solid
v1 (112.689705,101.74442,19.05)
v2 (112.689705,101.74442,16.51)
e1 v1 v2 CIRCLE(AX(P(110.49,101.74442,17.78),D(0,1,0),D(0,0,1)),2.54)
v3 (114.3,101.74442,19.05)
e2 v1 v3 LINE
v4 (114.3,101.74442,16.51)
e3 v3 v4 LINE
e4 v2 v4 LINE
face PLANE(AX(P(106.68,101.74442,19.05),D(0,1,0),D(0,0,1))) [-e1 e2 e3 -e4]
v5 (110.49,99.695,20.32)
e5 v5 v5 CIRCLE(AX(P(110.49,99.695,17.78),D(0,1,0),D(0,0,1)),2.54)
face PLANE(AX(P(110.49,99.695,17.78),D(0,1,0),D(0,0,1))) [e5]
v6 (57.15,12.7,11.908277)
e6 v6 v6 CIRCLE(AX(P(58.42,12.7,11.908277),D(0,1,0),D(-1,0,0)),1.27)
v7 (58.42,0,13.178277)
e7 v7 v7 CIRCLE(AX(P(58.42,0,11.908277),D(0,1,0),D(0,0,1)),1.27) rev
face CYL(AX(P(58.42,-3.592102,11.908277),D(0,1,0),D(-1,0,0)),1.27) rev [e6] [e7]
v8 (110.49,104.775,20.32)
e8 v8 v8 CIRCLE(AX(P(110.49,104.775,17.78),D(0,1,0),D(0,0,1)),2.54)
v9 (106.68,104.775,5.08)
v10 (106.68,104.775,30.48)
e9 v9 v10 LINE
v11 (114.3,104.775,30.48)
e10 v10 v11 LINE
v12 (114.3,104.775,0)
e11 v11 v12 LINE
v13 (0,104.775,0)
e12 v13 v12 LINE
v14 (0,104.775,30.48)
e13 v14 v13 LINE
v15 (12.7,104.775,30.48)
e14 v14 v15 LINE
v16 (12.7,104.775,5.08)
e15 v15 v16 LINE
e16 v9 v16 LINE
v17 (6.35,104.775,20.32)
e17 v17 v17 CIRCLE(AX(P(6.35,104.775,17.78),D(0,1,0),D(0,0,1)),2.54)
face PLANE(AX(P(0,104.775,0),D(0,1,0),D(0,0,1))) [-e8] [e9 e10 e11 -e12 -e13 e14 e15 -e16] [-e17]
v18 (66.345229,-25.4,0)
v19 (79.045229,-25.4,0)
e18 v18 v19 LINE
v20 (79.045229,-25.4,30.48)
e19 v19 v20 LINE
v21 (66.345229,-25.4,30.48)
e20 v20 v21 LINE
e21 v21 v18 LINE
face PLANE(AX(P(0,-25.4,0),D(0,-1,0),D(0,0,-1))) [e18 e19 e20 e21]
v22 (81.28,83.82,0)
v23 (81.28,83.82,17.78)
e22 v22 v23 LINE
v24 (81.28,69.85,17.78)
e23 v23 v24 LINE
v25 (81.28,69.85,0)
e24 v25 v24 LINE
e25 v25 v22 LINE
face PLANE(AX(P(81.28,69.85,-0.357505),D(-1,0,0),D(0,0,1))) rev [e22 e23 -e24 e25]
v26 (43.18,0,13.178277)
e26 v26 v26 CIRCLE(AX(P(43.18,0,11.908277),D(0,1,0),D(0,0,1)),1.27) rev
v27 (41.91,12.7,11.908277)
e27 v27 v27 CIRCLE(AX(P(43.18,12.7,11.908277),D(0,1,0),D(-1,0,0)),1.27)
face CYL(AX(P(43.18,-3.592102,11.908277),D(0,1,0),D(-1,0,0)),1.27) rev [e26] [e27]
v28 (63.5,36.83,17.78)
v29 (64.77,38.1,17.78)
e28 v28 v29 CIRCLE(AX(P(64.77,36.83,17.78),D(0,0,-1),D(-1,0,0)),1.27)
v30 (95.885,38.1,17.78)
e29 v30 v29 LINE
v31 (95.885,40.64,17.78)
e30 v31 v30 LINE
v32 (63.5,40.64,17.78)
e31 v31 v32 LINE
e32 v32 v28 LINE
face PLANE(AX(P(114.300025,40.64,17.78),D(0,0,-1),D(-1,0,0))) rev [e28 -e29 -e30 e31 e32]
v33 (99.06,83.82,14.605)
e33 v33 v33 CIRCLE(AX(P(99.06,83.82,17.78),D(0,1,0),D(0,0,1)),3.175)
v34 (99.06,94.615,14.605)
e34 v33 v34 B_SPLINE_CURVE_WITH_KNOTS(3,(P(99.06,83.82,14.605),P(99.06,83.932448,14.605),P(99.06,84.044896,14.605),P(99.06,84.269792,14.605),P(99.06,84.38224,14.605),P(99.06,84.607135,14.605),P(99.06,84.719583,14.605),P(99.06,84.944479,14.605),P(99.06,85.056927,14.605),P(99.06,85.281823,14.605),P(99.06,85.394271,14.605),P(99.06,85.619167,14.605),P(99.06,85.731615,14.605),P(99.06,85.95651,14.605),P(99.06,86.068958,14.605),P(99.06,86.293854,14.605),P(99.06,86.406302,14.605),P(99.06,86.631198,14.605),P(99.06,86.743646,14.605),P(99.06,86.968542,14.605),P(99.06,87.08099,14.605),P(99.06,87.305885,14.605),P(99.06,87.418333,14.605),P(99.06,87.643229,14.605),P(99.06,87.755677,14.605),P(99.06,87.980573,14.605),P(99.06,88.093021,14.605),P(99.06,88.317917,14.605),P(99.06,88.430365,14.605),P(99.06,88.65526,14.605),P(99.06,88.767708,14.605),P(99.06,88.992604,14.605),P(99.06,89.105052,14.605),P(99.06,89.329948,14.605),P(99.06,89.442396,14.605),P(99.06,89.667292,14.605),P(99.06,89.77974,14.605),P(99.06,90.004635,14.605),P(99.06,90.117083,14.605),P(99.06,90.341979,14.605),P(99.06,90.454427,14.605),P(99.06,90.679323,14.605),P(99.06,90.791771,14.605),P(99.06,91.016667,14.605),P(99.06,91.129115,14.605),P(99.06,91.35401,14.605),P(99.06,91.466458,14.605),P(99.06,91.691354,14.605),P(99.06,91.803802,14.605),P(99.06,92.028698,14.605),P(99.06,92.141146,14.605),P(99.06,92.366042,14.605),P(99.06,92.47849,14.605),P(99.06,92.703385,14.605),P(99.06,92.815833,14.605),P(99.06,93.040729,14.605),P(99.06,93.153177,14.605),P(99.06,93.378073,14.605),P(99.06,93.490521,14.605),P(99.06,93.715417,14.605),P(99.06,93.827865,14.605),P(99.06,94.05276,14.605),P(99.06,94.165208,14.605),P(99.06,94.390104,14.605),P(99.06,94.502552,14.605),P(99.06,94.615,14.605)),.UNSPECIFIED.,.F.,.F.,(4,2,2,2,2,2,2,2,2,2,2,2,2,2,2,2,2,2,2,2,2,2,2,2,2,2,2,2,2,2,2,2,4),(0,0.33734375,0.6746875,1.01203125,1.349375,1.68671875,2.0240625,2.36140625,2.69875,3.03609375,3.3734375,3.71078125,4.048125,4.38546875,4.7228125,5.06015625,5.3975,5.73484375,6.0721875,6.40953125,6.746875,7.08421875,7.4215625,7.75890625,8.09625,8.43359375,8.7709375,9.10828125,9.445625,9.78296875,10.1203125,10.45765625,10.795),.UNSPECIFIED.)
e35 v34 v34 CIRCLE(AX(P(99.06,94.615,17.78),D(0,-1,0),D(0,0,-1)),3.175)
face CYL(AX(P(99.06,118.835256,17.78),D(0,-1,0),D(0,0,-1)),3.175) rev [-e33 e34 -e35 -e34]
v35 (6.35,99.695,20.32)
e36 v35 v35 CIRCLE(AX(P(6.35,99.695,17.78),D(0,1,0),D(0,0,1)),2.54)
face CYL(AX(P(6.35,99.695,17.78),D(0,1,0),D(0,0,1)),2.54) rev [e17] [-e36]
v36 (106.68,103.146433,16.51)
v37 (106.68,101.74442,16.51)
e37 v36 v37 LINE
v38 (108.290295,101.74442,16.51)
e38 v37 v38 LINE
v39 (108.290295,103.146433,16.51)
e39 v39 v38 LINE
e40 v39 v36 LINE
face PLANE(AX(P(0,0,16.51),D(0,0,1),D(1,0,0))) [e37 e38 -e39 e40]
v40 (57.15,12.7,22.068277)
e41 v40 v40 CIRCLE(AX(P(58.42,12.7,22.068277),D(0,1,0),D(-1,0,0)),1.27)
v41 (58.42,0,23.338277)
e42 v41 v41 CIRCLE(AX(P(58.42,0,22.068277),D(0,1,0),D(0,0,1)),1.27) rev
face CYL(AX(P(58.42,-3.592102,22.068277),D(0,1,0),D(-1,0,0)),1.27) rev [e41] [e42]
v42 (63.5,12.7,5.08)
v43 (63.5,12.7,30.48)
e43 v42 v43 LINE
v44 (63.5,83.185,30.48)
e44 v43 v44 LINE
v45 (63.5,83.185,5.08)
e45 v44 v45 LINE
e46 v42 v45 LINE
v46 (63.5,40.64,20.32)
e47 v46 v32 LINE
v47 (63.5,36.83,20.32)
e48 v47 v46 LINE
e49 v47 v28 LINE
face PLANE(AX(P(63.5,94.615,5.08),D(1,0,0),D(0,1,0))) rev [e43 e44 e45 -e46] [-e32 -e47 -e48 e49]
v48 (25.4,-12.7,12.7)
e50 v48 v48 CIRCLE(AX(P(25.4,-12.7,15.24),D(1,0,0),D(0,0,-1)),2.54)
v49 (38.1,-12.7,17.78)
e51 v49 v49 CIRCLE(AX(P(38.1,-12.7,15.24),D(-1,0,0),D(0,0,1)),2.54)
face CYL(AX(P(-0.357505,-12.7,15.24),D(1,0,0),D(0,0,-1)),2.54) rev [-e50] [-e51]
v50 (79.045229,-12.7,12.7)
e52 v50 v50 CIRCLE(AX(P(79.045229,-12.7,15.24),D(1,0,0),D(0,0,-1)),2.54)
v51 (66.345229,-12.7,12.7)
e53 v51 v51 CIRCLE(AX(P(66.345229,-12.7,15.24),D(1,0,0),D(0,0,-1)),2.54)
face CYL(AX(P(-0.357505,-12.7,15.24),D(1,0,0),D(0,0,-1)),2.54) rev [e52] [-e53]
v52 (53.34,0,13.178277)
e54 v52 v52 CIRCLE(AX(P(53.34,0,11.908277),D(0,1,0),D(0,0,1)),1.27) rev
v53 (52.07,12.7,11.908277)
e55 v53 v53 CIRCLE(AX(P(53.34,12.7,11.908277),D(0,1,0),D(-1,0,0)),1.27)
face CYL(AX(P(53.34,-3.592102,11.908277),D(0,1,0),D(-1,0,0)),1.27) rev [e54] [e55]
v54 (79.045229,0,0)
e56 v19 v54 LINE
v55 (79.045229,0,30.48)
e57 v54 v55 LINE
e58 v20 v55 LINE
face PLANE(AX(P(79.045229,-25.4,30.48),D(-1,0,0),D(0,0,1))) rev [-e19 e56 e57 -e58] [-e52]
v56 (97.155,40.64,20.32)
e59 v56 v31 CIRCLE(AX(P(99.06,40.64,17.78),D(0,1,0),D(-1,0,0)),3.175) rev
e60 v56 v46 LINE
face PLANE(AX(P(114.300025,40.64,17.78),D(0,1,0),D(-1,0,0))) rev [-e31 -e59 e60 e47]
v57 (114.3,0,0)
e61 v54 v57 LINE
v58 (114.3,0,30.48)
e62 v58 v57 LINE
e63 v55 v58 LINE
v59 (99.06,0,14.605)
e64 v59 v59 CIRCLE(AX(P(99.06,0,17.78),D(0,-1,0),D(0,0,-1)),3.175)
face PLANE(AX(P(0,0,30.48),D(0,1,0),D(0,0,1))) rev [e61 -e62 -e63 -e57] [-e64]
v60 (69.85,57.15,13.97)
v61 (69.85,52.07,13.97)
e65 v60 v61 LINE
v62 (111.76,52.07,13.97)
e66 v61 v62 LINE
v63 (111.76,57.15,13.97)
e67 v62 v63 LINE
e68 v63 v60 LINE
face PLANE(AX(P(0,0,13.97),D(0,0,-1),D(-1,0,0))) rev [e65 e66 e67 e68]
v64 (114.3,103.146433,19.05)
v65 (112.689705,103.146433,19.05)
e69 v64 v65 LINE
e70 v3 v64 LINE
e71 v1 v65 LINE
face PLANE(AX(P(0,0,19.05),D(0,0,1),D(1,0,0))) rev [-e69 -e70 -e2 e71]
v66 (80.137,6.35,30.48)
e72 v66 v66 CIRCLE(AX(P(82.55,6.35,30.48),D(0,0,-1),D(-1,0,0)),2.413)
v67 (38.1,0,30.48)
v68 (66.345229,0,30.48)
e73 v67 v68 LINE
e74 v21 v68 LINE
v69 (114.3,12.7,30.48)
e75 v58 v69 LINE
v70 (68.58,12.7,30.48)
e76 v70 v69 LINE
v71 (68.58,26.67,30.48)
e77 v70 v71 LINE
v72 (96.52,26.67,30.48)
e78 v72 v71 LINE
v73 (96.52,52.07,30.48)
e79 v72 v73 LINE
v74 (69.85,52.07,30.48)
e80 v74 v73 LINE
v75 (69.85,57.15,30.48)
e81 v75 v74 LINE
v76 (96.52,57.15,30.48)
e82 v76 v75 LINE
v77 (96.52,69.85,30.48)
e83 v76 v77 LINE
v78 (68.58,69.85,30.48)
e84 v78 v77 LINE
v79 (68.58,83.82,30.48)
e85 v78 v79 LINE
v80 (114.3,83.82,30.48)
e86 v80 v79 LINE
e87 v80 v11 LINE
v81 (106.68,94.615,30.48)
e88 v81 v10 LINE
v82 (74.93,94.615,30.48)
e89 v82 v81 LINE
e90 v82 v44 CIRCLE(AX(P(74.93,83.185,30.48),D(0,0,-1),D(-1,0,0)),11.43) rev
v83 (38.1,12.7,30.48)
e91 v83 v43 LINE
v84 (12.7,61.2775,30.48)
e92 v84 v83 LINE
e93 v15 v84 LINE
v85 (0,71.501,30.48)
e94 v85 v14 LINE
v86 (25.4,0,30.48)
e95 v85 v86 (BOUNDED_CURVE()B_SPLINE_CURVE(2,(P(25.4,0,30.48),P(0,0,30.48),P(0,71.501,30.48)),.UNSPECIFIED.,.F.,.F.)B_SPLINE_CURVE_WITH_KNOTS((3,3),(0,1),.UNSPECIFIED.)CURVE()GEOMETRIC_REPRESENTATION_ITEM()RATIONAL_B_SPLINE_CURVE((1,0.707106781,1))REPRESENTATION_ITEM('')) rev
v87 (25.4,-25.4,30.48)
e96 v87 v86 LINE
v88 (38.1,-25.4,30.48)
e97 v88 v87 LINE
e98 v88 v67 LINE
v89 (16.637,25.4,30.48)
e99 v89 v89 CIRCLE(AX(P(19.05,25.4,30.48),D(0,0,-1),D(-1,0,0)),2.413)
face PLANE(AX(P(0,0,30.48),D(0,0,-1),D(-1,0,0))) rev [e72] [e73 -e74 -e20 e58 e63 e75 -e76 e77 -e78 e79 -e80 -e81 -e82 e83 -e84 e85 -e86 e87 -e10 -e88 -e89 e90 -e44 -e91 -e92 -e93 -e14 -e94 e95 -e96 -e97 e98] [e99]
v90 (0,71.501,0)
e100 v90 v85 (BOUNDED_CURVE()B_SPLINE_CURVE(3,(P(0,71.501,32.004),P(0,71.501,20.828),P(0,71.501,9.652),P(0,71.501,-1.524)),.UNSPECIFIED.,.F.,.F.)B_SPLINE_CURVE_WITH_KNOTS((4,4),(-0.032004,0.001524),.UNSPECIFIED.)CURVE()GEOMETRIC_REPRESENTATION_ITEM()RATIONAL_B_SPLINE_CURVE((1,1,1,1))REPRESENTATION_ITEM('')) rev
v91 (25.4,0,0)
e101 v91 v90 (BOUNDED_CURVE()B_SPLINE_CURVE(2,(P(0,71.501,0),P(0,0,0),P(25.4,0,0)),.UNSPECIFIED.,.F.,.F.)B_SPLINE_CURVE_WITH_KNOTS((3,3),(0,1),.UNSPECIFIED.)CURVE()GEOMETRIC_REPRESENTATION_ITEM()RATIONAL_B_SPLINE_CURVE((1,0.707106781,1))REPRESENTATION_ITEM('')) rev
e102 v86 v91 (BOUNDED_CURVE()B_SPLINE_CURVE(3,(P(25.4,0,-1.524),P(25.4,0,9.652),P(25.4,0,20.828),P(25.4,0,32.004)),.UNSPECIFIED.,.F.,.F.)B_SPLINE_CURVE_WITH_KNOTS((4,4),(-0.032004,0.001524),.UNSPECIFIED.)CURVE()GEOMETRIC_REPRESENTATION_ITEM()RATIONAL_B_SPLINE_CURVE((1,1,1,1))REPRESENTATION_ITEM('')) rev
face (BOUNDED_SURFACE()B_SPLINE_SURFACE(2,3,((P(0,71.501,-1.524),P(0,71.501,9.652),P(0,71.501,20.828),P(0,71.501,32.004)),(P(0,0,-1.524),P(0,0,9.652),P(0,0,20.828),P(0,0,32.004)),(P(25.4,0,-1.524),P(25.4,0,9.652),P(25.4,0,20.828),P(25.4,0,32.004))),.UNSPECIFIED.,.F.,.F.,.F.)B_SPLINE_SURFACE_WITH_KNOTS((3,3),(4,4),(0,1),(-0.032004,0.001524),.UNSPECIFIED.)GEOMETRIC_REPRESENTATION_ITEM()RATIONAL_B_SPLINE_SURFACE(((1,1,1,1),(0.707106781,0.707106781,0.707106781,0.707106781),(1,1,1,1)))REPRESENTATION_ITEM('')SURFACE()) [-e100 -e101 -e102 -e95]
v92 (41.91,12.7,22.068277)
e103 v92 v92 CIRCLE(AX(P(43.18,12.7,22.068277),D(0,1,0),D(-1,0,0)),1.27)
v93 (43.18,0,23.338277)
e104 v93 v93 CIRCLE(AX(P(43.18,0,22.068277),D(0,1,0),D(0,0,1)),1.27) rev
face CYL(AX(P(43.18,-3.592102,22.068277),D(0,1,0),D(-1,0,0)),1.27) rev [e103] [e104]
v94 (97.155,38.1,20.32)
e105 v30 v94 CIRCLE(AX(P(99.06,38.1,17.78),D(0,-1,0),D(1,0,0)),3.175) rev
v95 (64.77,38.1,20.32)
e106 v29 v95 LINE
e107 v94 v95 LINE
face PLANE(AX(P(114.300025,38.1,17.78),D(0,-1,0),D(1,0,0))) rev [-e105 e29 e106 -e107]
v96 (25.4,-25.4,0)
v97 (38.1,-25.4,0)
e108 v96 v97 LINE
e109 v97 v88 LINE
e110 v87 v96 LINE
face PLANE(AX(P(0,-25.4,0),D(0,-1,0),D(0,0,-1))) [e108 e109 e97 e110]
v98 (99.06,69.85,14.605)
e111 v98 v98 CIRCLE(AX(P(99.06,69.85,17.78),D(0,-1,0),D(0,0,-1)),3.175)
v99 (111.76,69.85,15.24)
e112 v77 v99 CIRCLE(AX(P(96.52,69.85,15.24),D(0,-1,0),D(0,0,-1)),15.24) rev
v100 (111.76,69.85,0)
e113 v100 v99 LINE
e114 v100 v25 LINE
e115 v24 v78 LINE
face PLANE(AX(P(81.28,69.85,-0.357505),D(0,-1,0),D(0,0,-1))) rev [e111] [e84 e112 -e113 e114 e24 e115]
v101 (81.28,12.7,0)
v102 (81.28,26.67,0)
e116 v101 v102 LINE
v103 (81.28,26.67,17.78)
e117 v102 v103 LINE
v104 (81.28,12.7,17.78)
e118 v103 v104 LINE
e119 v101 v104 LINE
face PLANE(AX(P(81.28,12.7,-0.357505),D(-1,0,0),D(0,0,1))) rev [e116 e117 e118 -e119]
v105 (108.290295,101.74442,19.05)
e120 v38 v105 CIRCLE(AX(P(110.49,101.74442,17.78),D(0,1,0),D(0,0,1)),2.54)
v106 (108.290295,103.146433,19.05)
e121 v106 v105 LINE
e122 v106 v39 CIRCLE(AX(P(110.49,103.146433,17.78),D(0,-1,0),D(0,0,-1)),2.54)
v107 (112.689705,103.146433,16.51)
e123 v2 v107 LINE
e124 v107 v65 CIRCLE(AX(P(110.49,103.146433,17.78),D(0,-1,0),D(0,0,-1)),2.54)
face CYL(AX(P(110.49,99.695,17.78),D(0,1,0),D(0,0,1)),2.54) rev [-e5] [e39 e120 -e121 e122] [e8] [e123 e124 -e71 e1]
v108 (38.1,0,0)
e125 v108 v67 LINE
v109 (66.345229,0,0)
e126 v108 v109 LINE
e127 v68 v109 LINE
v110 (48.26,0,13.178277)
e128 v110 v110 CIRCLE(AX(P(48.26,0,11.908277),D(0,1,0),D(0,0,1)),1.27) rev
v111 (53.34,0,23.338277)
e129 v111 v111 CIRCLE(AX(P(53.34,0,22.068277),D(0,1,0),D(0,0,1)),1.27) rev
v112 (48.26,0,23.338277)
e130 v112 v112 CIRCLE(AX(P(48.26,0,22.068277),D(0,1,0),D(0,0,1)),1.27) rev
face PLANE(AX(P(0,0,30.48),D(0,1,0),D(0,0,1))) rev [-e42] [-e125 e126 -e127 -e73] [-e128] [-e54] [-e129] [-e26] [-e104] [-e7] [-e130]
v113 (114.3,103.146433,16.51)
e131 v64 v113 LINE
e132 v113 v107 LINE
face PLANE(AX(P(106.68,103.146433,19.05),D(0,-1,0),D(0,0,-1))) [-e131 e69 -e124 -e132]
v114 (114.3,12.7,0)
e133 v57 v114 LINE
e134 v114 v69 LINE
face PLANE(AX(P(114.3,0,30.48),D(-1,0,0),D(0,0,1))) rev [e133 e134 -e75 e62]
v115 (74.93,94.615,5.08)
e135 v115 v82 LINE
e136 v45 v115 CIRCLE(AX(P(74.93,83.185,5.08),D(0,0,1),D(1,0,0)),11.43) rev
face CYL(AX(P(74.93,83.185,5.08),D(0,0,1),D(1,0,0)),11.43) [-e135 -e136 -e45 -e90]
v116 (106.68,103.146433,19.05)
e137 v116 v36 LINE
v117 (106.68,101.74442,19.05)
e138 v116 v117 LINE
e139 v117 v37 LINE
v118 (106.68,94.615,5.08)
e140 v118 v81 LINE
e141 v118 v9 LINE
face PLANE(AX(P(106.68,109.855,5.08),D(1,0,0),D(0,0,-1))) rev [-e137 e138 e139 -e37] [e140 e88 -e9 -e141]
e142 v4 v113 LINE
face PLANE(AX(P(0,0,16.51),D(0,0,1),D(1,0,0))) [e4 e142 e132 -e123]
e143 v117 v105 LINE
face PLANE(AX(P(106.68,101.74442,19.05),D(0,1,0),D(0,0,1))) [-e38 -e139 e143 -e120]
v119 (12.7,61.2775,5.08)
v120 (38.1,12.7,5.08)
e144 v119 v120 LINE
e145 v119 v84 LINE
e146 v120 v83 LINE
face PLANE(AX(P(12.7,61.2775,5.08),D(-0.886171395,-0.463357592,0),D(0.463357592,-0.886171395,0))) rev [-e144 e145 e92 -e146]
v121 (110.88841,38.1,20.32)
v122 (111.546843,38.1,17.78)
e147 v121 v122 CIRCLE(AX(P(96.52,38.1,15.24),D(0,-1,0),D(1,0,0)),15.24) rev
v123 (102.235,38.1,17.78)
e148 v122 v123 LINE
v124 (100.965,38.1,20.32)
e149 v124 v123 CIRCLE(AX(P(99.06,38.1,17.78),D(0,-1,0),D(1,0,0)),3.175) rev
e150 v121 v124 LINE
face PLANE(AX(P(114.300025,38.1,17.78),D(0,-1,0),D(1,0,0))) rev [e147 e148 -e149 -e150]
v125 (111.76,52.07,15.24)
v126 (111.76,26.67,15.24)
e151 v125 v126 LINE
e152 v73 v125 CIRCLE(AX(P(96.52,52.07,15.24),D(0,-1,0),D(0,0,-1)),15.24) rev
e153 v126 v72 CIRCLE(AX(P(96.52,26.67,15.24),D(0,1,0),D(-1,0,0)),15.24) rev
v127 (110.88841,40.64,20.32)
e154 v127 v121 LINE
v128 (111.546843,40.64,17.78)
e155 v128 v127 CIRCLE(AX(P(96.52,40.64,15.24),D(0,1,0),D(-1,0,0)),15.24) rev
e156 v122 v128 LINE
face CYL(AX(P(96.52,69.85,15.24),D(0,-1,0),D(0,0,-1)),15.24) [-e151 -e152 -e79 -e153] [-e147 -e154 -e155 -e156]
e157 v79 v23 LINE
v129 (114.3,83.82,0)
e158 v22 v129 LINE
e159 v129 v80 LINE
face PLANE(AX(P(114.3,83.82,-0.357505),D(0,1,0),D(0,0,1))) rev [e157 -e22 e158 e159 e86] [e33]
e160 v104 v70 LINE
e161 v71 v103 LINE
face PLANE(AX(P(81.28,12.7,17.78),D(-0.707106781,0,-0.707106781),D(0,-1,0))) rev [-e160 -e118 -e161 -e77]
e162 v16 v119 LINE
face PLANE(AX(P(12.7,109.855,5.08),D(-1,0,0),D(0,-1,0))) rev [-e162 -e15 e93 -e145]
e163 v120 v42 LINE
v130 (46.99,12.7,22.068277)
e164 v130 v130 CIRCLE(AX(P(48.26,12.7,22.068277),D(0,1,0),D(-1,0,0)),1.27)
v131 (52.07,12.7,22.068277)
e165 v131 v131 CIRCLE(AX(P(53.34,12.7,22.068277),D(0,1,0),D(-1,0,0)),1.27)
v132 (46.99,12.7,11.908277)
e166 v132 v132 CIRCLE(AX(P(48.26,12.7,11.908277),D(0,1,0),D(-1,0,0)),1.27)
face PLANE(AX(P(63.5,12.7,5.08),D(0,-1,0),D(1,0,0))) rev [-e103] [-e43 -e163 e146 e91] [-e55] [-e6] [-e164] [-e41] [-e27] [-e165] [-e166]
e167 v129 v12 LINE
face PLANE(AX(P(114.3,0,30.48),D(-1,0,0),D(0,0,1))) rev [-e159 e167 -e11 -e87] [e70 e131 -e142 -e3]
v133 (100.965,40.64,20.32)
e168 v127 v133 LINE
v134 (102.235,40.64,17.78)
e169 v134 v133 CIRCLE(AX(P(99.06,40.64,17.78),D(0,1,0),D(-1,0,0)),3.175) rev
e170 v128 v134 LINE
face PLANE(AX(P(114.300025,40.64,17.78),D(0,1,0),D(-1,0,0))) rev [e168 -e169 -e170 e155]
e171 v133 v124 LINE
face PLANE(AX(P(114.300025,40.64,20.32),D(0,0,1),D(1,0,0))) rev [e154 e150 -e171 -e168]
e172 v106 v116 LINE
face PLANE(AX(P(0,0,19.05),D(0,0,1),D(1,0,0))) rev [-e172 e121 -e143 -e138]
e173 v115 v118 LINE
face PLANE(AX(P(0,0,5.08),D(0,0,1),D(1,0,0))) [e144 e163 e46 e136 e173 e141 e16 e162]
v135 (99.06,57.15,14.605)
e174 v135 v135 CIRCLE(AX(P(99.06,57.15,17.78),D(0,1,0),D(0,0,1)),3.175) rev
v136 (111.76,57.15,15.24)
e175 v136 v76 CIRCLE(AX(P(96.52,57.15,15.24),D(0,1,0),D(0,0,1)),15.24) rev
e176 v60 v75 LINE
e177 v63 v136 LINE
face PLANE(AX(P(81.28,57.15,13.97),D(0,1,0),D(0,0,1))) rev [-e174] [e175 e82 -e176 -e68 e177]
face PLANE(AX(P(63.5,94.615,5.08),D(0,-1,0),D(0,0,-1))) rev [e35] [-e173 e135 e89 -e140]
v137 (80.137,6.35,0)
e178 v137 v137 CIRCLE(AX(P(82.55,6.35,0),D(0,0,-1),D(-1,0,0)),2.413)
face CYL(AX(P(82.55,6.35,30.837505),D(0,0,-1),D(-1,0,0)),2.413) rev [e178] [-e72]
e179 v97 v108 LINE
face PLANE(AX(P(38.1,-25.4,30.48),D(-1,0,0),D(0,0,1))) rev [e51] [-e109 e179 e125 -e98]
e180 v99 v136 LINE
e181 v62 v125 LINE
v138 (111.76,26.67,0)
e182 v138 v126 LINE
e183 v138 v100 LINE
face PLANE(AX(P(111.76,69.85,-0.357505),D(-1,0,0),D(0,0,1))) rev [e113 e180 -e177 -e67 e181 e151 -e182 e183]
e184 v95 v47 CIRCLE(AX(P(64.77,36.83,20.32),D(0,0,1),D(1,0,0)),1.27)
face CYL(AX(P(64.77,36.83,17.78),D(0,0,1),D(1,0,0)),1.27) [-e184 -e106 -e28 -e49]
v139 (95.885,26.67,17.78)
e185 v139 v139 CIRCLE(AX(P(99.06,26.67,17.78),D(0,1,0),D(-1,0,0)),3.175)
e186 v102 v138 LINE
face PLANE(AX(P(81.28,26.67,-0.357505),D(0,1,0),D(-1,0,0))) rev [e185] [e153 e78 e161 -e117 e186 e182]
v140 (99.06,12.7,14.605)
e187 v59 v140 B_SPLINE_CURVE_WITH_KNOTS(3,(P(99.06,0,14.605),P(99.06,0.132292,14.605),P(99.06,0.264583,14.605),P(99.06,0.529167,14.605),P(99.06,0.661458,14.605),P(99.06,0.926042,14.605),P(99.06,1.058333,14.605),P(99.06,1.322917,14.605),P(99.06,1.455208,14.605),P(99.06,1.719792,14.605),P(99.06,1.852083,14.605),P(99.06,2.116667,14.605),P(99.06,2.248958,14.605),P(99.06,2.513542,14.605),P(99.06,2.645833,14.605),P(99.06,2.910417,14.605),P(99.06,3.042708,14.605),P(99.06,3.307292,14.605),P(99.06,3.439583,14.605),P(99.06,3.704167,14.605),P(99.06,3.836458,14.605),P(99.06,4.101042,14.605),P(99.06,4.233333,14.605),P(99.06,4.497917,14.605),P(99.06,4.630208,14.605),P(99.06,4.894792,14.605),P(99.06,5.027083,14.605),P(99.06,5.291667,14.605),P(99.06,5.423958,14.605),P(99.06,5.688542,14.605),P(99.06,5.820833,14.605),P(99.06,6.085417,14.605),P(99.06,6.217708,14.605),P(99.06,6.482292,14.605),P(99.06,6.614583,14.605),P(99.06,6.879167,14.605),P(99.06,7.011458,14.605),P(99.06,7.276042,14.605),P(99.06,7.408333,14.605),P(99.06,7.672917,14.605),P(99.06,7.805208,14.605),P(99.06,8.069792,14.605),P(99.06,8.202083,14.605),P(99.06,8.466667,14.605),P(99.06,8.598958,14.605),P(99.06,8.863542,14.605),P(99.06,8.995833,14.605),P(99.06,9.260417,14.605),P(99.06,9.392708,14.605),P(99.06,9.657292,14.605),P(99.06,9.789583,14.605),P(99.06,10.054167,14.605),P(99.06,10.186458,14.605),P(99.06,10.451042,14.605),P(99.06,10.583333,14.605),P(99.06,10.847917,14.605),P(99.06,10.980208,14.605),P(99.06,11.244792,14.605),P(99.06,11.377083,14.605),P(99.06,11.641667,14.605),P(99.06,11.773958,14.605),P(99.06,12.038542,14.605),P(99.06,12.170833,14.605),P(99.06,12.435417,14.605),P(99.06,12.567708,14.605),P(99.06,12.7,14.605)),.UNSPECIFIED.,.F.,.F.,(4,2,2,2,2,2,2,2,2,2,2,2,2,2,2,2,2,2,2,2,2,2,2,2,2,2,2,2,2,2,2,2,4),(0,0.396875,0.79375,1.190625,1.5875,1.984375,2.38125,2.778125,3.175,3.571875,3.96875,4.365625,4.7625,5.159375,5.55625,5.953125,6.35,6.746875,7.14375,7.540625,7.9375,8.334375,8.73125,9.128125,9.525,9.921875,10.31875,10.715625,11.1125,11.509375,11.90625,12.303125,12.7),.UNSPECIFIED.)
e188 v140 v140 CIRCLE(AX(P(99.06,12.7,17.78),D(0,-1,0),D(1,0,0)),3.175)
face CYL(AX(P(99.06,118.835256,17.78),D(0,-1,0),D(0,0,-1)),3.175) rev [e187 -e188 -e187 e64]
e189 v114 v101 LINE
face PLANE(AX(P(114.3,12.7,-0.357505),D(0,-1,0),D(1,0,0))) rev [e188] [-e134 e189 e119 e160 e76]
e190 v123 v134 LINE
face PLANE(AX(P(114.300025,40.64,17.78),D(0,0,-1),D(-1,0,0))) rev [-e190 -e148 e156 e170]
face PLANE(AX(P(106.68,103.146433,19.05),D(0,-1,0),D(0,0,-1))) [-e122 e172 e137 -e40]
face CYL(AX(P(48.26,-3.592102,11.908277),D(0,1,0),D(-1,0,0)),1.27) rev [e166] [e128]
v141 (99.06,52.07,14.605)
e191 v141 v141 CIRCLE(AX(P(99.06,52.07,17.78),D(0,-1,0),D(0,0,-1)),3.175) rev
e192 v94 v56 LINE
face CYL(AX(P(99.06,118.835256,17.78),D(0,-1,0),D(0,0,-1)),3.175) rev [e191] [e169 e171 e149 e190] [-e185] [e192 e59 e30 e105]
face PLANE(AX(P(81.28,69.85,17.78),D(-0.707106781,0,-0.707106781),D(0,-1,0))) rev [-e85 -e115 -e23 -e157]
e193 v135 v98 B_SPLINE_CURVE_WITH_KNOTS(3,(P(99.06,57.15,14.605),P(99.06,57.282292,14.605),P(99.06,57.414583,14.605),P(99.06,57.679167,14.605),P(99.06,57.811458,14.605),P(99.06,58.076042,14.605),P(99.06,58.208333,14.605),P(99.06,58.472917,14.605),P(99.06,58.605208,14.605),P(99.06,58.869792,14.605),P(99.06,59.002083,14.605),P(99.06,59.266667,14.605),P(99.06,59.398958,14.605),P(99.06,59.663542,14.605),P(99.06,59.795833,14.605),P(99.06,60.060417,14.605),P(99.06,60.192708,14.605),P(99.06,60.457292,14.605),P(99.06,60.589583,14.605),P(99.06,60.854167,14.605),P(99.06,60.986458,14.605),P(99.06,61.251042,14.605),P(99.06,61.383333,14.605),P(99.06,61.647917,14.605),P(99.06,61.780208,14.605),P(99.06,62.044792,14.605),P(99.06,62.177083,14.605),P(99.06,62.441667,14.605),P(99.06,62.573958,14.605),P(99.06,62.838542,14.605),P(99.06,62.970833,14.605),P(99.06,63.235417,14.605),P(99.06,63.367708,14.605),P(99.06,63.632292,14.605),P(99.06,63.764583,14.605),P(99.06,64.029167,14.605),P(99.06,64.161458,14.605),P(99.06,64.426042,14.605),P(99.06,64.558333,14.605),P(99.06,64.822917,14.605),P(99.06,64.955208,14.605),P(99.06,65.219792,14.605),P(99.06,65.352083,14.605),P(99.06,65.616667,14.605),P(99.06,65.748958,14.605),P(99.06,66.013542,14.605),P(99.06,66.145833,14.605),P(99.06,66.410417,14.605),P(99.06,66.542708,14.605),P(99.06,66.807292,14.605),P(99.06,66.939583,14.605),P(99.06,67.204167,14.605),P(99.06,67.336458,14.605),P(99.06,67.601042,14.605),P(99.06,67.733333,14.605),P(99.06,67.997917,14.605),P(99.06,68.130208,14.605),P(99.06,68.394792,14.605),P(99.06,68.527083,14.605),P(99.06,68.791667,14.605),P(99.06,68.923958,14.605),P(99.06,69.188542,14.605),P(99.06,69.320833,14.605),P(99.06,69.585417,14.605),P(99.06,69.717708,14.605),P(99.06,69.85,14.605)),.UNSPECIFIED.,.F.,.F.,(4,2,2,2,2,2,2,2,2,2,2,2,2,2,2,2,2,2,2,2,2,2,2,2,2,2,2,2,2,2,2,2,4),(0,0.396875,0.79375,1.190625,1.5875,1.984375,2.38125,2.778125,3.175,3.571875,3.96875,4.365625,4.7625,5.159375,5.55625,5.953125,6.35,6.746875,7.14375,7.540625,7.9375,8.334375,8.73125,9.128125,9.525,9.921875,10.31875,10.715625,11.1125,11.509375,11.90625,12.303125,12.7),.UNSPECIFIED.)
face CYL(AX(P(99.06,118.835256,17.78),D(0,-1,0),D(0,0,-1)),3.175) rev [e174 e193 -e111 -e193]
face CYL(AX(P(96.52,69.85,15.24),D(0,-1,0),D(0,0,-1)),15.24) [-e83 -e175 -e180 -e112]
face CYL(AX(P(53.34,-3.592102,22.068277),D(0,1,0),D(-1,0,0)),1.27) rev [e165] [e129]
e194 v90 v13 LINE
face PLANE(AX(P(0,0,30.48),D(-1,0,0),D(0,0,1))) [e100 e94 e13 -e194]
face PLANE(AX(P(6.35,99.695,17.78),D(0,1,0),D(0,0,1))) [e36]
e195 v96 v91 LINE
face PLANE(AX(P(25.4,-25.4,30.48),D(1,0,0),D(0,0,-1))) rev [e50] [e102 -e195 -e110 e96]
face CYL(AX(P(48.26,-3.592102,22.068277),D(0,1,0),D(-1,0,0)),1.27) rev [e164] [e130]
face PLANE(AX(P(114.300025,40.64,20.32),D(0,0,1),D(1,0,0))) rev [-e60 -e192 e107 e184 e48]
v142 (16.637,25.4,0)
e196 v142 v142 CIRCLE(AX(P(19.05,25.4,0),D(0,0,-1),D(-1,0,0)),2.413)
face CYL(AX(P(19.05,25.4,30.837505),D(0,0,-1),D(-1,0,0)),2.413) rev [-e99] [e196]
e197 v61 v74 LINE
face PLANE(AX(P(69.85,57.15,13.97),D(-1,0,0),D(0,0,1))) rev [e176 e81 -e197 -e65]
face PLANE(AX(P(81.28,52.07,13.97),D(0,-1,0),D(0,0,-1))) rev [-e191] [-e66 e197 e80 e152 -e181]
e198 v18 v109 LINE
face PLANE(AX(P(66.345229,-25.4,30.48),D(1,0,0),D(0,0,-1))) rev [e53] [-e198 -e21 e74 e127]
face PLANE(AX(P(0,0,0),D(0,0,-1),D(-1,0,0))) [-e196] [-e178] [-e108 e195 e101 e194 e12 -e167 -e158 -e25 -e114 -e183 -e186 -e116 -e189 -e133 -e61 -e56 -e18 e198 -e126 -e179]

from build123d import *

# Parameters (mm, degrees)
SKETCH2_W                      = 114.3
SKETCH2_H                      = 142.875
BOSS_EXTRUDE2_DEPTH            = 30.48
FILLET1_SIZE                   = 25.4
FILLET1_SIZE_2                 = 71.501
BOSS_EXTRUDE3_DEPTH            = 11.43
CUT_EXTRUDE2_DEPTH             = 25.4
FILLET2_R                      = 1.27
SKETCH7_W                      = 27.94
SKETCH7_H                      = 30.48
CUT_EXTRUDE4_DEPTH             = 12.7
BOSS_EXTRUDE4_DEPTH            = 11.43
CUT_EXTRUDE6_DEPTH             = 25.4
CUT_EXTRUDE7_DEPTH             = 171.262283535
CUT_EXTRUDE7_DEPTH_BACK        = 171.262283535
SKETCH11_R                     = 3.175
CUT_EXTRUDE8_REACH             = 185.225
SKETCH12_R                     = 3.175
CUT_EXTRUDE8_DIRECTION_2_DEPTH = 184.224735996
CHAMFER1_SIZE2                 = 12.7
CHAMFER1_SIZE                  = 2.54
SKETCH13_W                     = 7.62
SKETCH13_H                     = 5.08
CUT_EXTRUDE9_DEPTH             = 25.4
FILLET4_R                      = 1.27
CUT_EXTRUDE10_DEPTH            = 195.431359314
CHAMFER2_SIZE                  = 12.7
CUT_EXTRUDE11_REACH            = 196.431
SKETCH15_R                     = 3.175
BOSS_EXTRUDE5_DEPTH            = 1.27
CHAMFER3_SIZE                  = 1.27
BOSS_EXTRUDE6_DEPTH            = 1.27
CHAMFER4_SIZE                  = 1.27
FILLET5_R                      = 15.24
CUT_EXTRUDE12_DEPTH            = 16.51
SKETCH20_W                     = 2.54
SKETCH20_H                     = 2.54
CUT_EXTRUDE13_DEPTH            = 171.777226453
FILLET6_R                      = 1.27
CUT_EXTRUDE14_DEPTH            = 1.27
CUT_EXTRUDE14_DEPTH_BACK       = 1.27
SKETCH21_W                     = 5.08
SKETCH21_H                     = 33.02
SKETCH21_H_2                   = 10.040791179
SKETCH21_H_3                   = 10.09120709
SKETCH21_W_2                   = 7.62
SKETCH21_H_4                   = 1.402013576
SKETCH21_W_3                   = 1.485233779
FILLET7_R                      = 11.43
SKETCH22_R                     = 1.27
CUT_EXTRUDE15_DEPTH            = 12.7
CUT_EXTRUDE16_DEPTH            = 196.440786647
CUT_EXTRUDE16_DEPTH_BACK       = 196.440786647
SKETCH23_R                     = 2.413
SKETCH24_W                     = 12.7
SKETCH24_H                     = 30.48
BOSS_EXTRUDE7_DEPTH            = 25.4
SKETCH25_R                     = 2.54
CUT_EXTRUDE17_DEPTH            = 178.14615249
CUT_EXTRUDE18_DEPTH            = 30.48
CUT_EXTRUDE18_DEPTH_BACK       = 25.4
SKETCH26_W                     = 134.610990208
SKETCH26_H                     = 60.509174752
SKETCH27_R                     = 2.54
CUT_EXTRUDE19_DEPTH            = 5.08


# Some blends are built 0.0001 mm under size
with BuildPart() as part:
    # Sketch2 → Boss-Extrude2 (new body)
    with BuildSketch(Plane.XY):
        with Locations((57.15, 71.4375)):
            Rectangle(SKETCH2_W, SKETCH2_H)
    extrude(amount=BOSS_EXTRUDE2_DEPTH)

    # Fillet1
    # an asymmetric fillet: 71.501, 25.4 mm, written as the material it takes off along each edge
    with BuildSketch(Plane(origin=(0, 0, -178.7525), x_dir=(1, 0, 0), z_dir=(0, 0, 1))) as fillet1_piece_1:
        with BuildLine():
            Bezier((FILLET1_SIZE, 0), (0, 0), (0, FILLET1_SIZE_2), weights=[1, 0.707106781, 1])
            Line((0, FILLET1_SIZE_2), (0, 0))
            Line((0, 0), (FILLET1_SIZE, 0))
        make_face()
    extrude(amount=387.985, mode=Mode.SUBTRACT)

    # Sketch3 → Boss-Extrude3 (add)
    with BuildSketch(Plane(origin=(0, 142.875, 0), x_dir=(1, 0, 0), z_dir=(0, 1, 0))):
        with BuildLine():
            Line((33.866582, -7.62), (33.866582, -27.94))
            ThreePointArc((33.866582, -27.94), (28.786582, -17.78), (33.866582, -7.62))
        make_face()
        with BuildLine():
            Line((49.106582, -7.62), (49.106582, -27.94))
            ThreePointArc((49.106582, -27.94), (54.186582, -17.78), (49.106582, -7.62))
        make_face()
    extrude(amount=BOSS_EXTRUDE3_DEPTH)

    # Sketch5 → Cut-Extrude2 (cut)
    with BuildSketch(Plane.XY.offset(30.48)):
        with BuildLine():
            Line((62.653333333, 142.875), (77.893333333, 142.875))
            ThreePointArc((77.893333333, 142.875), (70.273333333, 119.445231961), (62.653333333, 142.875))
        make_face()
        with BuildLine():
            Line((91.44, 143.032457663), (106.68, 143.032457663))
            ThreePointArc((106.68, 143.032457663), (99.06, 119.602689625), (91.44, 143.032457663))
        make_face()
    extrude(amount=-CUT_EXTRUDE2_DEPTH, mode=Mode.SUBTRACT)

    # Fillet2
    fillet2_edges = [part.edges().sort_by_distance(p)[0] for p in [
        (77.893333333, 142.875, 17.78),
        (62.653333333, 142.875, 17.78),
        (91.228104508, 142.875, 17.78),
    ]]
    fillet(fillet2_edges, radius=FILLET2_R)

    # Sketch7 → Cut-Extrude4 (cut)
    with BuildSketch(Plane(origin=(0, 142.875, 0), x_dir=(1, 0, 0), z_dir=(0, 1, 0))):
        with Locations((13.97, -15.24)):
            Rectangle(SKETCH7_W, SKETCH7_H)
    extrude(amount=-CUT_EXTRUDE4_DEPTH, mode=Mode.SUBTRACT)

    # Sketch8 → Boss-Extrude4 (add)
    with BuildSketch(Plane(origin=(0, 130.175, 0), x_dir=(1, 0, 0), z_dir=(0, 1, 0))):
        with BuildLine():
            Line((5.08, -7.62), (5.08, -27.94))
            ThreePointArc((5.08, -27.94), (0, -17.78), (5.08, -7.62))
        make_face()
        with BuildLine():
            Line((20.32, -7.62), (20.32, -27.94))
            ThreePointArc((20.32, -27.94), (25.4, -17.78), (20.32, -7.62))
        make_face()
    extrude(amount=BOSS_EXTRUDE4_DEPTH)

    # Sketch10 → Cut-Extrude6 (cut)
    with BuildSketch(Plane.XY.offset(30.48)):
        Polygon((63.5, 109.855), (12.7, 109.855), (12.7, 61.2775), (38.1, 12.7), (63.5, 12.7), (63.5, 94.615), (106.68, 94.615), (106.68, 109.855), align=None)
    extrude(amount=-CUT_EXTRUDE6_DEPTH, mode=Mode.SUBTRACT)

    # Sketch11 → Cut-Extrude7 (cut, two sides: drawn at the far end of the back side and taken through both)
    with BuildSketch(Plane.ZY.offset(-49.106582).offset(-CUT_EXTRUDE7_DEPTH_BACK)):
        with Locations((17.78, 149.225)):
            Circle(SKETCH11_R)
        with BuildLine():
            Line((22.044917923, 151.984868677), (27.94, 142.875))
            Line((27.94, 142.875), (27.94, 154.305))
            Line((27.94, 154.305), (17.78, 154.305))
            ThreePointArc((17.78, 154.305), (20.207577715, 153.687428312), (22.044917923, 151.984868677))
        make_face()
    extrude(amount=CUT_EXTRUDE7_DEPTH + CUT_EXTRUDE7_DEPTH_BACK, mode=Mode.SUBTRACT)

    # Cut-Extrude8: up to this face of the body (flat: up to its plane)
    cut_extrude8_end = Plane(part.part.faces().sort_by_distance((27.94, 136.525, 15.24))[0])
    # Sketch12 → Cut-Extrude8 (cut, up to the picked face)
    with BuildSketch(Plane.ZY.offset(-20.32), mode=Mode.PRIVATE) as cut_extrude8_sk1:
        with Locations((17.78, 136.525)):
            Circle(SKETCH12_R)
    cut_extrude8_tool1 = split(extrude(cut_extrude8_sk1.sketch, amount=-CUT_EXTRUDE8_REACH, mode=Mode.PRIVATE), bisect_by=cut_extrude8_end, keep=Keep.BOTH, mode=Mode.PRIVATE)
    # Sketch12 → Cut-Extrude8 (cut, up to the picked face)
    with BuildSketch(Plane.ZY.offset(-20.32), mode=Mode.PRIVATE) as cut_extrude8_sk2:
        with BuildLine():
            Line((22.044917923, 139.284868677), (27.94, 130.175))
            Line((27.94, 130.175), (27.94, 141.605))
            Line((27.94, 141.605), (17.78, 141.605))
            ThreePointArc((17.78, 141.605), (20.207577715, 140.987428312), (22.044917923, 139.284868677))
        make_face()
    cut_extrude8_tool2 = split(extrude(cut_extrude8_sk2.sketch, amount=-CUT_EXTRUDE8_REACH, mode=Mode.PRIVATE), bisect_by=cut_extrude8_end, keep=Keep.BOTH, mode=Mode.PRIVATE)
    add(cut_extrude8_tool1.solids().sort_by(Axis((20.32, 136.525, 17.78), (1, 0, 0)))[0], mode=Mode.SUBTRACT)
    add(cut_extrude8_tool2.solids().sort_by(Axis((20.32, 137.885407, 25.333291), (1, 0, 0)))[0], mode=Mode.SUBTRACT)

    # Sketch12 → Cut-Extrude8 direction 2 (cut)
    with BuildSketch(Plane.ZY.offset(-20.32)):
        with Locations((17.78, 136.525)):
            Circle(SKETCH12_R)
        with BuildLine():
            Line((22.044917923, 139.284868677), (27.94, 130.175))
            Line((27.94, 130.175), (27.94, 141.605))
            Line((27.94, 141.605), (17.78, 141.605))
            ThreePointArc((17.78, 141.605), (20.207577715, 140.987428312), (22.044917923, 139.284868677))
        make_face()
    extrude(amount=CUT_EXTRUDE8_DIRECTION_2_DEPTH, mode=Mode.SUBTRACT)

    # Chamfer1
    chamfer1_edges = [part.edges().sort_by_distance(p)[0] for p in [
        (27.94, 130.175, 15.24),
    ]]
    chamfer1_side = [part.faces().sort_by_distance(p)[0] for p in [
        (27.8892, 130.175, 15.24),
    ]]
    chamfer(chamfer1_edges, length=CHAMFER1_SIZE - 0.0001, length2=CHAMFER1_SIZE2 - 0.0001, reference=chamfer1_side[0])  # a hair under: the kernel refuses the full size

    # Sketch13 → Cut-Extrude9 (cut)
    with BuildSketch(Plane.XY.offset(30.48)):
        with Locations((110.49, 140.335)):
            Rectangle(SKETCH13_W, SKETCH13_H)
    extrude(amount=-CUT_EXTRUDE9_DEPTH, mode=Mode.SUBTRACT)

    # Fillet4
    fillet4_edges = [part.edges().sort_by_distance(p)[0] for p in [
        (110.907625096, 137.795, 17.78),
        (114.3, 137.795, 17.78),
    ]]
    fillet(fillet4_edges, radius=FILLET4_R)

    # Sketch14 → Cut-Extrude10 (cut, through all)
    with BuildSketch(Plane.XY.offset(30.48)):
        Polygon((114.3, 12.7), (81.28, 12.7), (81.28, 26.67), (111.76, 26.67), (111.76, 69.85), (81.28, 69.85), (81.28, 83.82), (114.3, 83.82), align=None)
    extrude(amount=-CUT_EXTRUDE10_DEPTH, mode=Mode.SUBTRACT)

    # Chamfer2
    chamfer2_edges = [part.edges().sort_by_distance(p)[0] for p in [
        (81.28, 76.835, 30.48),
        (81.28, 19.685, 30.48),
    ]]
    chamfer(chamfer2_edges, length=CHAMFER2_SIZE)

    # Cut-Extrude11: up to this face of the body (flat: up to its plane)
    cut_extrude11_end = Plane(part.part.faces().sort_by_distance((59.69, 109.855, 17.78))[0])
    # Sketch15 → Cut-Extrude11 (cut, up to the picked face)
    with BuildSketch(Plane.XZ, mode=Mode.PRIVATE) as cut_extrude11_sk1:
        with Locations(Location((99.06, 17.78, 0), (0, 0, 270))):
            Circle(SKETCH15_R)
    cut_extrude11_tool1 = split(extrude(cut_extrude11_sk1.sketch, amount=-CUT_EXTRUDE11_REACH, mode=Mode.PRIVATE), bisect_by=cut_extrude11_end, keep=Keep.BOTH, mode=Mode.PRIVATE)
    add(cut_extrude11_tool1.solids().sort_by(Axis((99.06, 0, 17.78), (0, 1, 0)))[0], mode=Mode.SUBTRACT)

    # Sketch16 → Boss-Extrude5 (add)
    with BuildSketch(Plane(origin=(0, 141.605, 0), x_dir=(1, 0, 0), z_dir=(0, 1, 0))):
        with BuildLine():
            Line((0.406992957, -14.590646171), (5.08, -14.605))
            Line((5.08, -14.605), (5.08, -7.62))
            ThreePointArc((5.08, -7.62), (2.151092977, -10.708185479), (0.406992957, -14.590646171))
        make_face()
        with BuildLine():
            Line((20.32, -14.605), (24.996722124, -14.605))
            ThreePointArc((24.996722124, -14.605), (23.253033275, -10.714344425), (20.32, -7.62))
            Line((20.32, -7.62), (20.32, -14.605))
        make_face()
    extrude(amount=BOSS_EXTRUDE5_DEPTH)

    # Chamfer3
    chamfer3_edges = [part.edges().sort_by_distance(p)[0] for p in [
        (22.658361062, 142.875, 14.605),
        (2.743496479, 142.875, 14.597823086),
    ]]
    chamfer(chamfer3_edges, length=CHAMFER3_SIZE - 0.0001)  # a hair under: the kernel refuses the full size

    # Sketch17 → Boss-Extrude6 (add)
    with BuildSketch(Plane(origin=(0, 154.305, 0), x_dir=(1, 0, 0), z_dir=(0, 1, 0))):
        with BuildLine():
            Line((29.150536334, -14.761394806), (33.866582, -14.761394806))
            Line((33.866582, -14.761394806), (33.866582, -7.62))
            ThreePointArc((33.866582, -7.62), (30.888902084, -10.781487273), (29.150536334, -14.761394806))
        make_face()
        with BuildLine():
            Line((49.106582, -14.761394806), (53.822627666, -14.761394806))
            ThreePointArc((53.822627666, -14.761394806), (52.084261916, -10.781487273), (49.106582, -7.62))
            Line((49.106582, -7.62), (49.106582, -14.761394806))
        make_face()
    extrude(amount=BOSS_EXTRUDE6_DEPTH)

    # Chamfer4
    chamfer4_edges = [part.edges().sort_by_distance(p)[0] for p in [
        (51.464604833, 155.575, 14.761394806),
        (31.508559167, 155.575, 14.761394806),
    ]]
    chamfer(chamfer4_edges, length=CHAMFER4_SIZE - 0.0001)  # a hair under: the kernel refuses the full size

    # Fillet5
    fillet5_edges = [part.edges().sort_by_distance(p)[0] for p in [
        (111.76, 48.26, 30.48),
    ]]
    fillet(fillet5_edges, radius=FILLET5_R)

    # Sketch19 → Cut-Extrude12 (cut)
    with BuildSketch(Plane.XY.offset(30.48)):
        Polygon((81.28, 52.07), (111.76, 52.07), (111.76, 57.15), (81.28, 57.15), (69.85, 57.15), (69.85, 52.07), align=None)
    extrude(amount=-CUT_EXTRUDE12_DEPTH, mode=Mode.SUBTRACT)

    # Sketch20 → Cut-Extrude13 (cut, through all)
    with BuildSketch(Plane.ZY.offset(-63.5)):
        with Locations((19.05, 39.37)):
            Rectangle(SKETCH20_W, SKETCH20_H)
    extrude(amount=-CUT_EXTRUDE13_DEPTH, mode=Mode.SUBTRACT)

    # Fillet6
    fillet6_edges = [part.edges().sort_by_distance(p)[0] for p in [
        (63.5, 38.1, 19.05),
    ]]
    fillet(fillet6_edges, radius=FILLET6_R)

    # Sketch21 → Cut-Extrude14 (cut, two sides: drawn at the far end of the back side and taken through both)
    with BuildSketch(Plane.XY.offset(17.78).offset(-CUT_EXTRUDE14_DEPTH_BACK)):
        Polygon((12.7, 109.855), (10.485930724, 130.175), (15.565930724, 130.175), (17.78, 109.855), align=None)
        Polygon((55.429725371, 142.875), (50.86041281, 121.653709764), (50.86041281, 109.855), (52.449738918, 109.855), (52.449738918, 121.653709764), (57.019051479, 142.875), align=None)
        with Locations((41.486582, 126.365)):
            Rectangle(SKETCH21_W, SKETCH21_H)
        with Locations((69.426582, 114.87539559)):
            Rectangle(SKETCH21_W, SKETCH21_H_2)
        with Locations((98.636582, 114.900603545)):
            Rectangle(SKETCH21_W, SKETCH21_H_3)
        with Locations((110.49, 102.445426643)):
            Rectangle(SKETCH21_W_2, SKETCH21_H_4)
        with Locations((84.636338767, 126.365)):
            Rectangle(SKETCH21_W_3, SKETCH21_H)
    extrude(amount=CUT_EXTRUDE14_DEPTH + CUT_EXTRUDE14_DEPTH_BACK, mode=Mode.SUBTRACT)

    # Fillet7
    fillet7_edges = [part.edges().sort_by_distance(p)[0] for p in [
        (63.5, 94.615, 17.78),
    ]]
    fillet(fillet7_edges, radius=FILLET7_R)

    # Sketch22 → Cut-Extrude15 (cut)
    with BuildSketch(Plane(origin=(0, 12.7, 0), x_dir=(1, 0, 0), z_dir=(0, 1, 0))):
        with Locations(Location((43.18, -11.908276952, 0), (0, 0, 180))):
            Circle(SKETCH22_R)
        with Locations(Location((48.26, -11.908276952, 0), (0, 0, 180))):
            Circle(SKETCH22_R)
        with Locations(Location((53.34, -11.908276952, 0), (0, 0, 180))):
            Circle(SKETCH22_R)
        with Locations(Location((58.42, -11.908276952, 0), (0, 0, 180))):
            Circle(SKETCH22_R)
        with Locations(Location((43.18, -22.068276952, 0), (0, 0, 180))):
            Circle(SKETCH22_R)
        with Locations(Location((48.26, -22.068276952, 0), (0, 0, 180))):
            Circle(SKETCH22_R)
        with Locations(Location((53.34, -22.068276952, 0), (0, 0, 180))):
            Circle(SKETCH22_R)
        with Locations(Location((58.42, -22.068276952, 0), (0, 0, 180))):
            Circle(SKETCH22_R)
    extrude(amount=-CUT_EXTRUDE15_DEPTH, mode=Mode.SUBTRACT)

    # Sketch23 → Cut-Extrude16 (cut, two sides: drawn at the far end of the back side and taken through both)
    with BuildSketch(Plane(origin=(0, 0, 0), x_dir=(-1, 0, 0), z_dir=(0, 0, -1)).offset(-CUT_EXTRUDE16_DEPTH_BACK)):
        with Locations((-25.4, 120.65)):
            Circle(SKETCH23_R)
        with Locations((-19.05, 25.4)):
            Circle(SKETCH23_R)
        with Locations((-82.55, 6.35)):
            Circle(SKETCH23_R)
    extrude(amount=CUT_EXTRUDE16_DEPTH + CUT_EXTRUDE16_DEPTH_BACK, mode=Mode.SUBTRACT)

    # Sketch24 → Boss-Extrude7 (add)
    with BuildSketch(Plane.XZ):
        with Locations((31.75, 15.24)):
            Rectangle(SKETCH24_W, SKETCH24_H)
        with Locations((72.695229231, 15.24)):
            Rectangle(SKETCH24_W, SKETCH24_H)
    extrude(amount=BOSS_EXTRUDE7_DEPTH)

    # Sketch25 → Cut-Extrude17 (cut, through all)
    with BuildSketch(Plane(origin=(79.045229231, 0, 0), x_dir=(0, 0, -1), z_dir=(1, 0, 0))):
        with Locations((-15.24, -12.7)):
            Circle(SKETCH25_R)
    extrude(amount=-CUT_EXTRUDE17_DEPTH, mode=Mode.SUBTRACT)

    # Sketch26 → Cut-Extrude18 (cut, two sides: drawn at the far end of the back side and taken through both)
    with BuildSketch(Plane(origin=(0, 130.175, 0), x_dir=(1, 0, 0), z_dir=(0, 1, 0)).offset(-CUT_EXTRUDE18_DEPTH_BACK)):
        with Locations((56.532775219, -11.951457894)):
            Rectangle(SKETCH26_W, SKETCH26_H)
    extrude(amount=CUT_EXTRUDE18_DEPTH + CUT_EXTRUDE18_DEPTH_BACK, mode=Mode.SUBTRACT)

    # Sketch27 → Cut-Extrude19 (cut)
    with BuildSketch(Plane(origin=(0, 104.775, 0), x_dir=(1, 0, 0), z_dir=(0, 1, 0))):
        with Locations(Location((6.35, -17.78, 0), (0, 0, 270))):
            Circle(SKETCH27_R)
        with Locations(Location((110.49, -17.78, 0), (0, 0, 270))):
            Circle(SKETCH27_R)
    extrude(amount=-CUT_EXTRUDE19_DEPTH, mode=Mode.SUBTRACT)


solid = part.part
